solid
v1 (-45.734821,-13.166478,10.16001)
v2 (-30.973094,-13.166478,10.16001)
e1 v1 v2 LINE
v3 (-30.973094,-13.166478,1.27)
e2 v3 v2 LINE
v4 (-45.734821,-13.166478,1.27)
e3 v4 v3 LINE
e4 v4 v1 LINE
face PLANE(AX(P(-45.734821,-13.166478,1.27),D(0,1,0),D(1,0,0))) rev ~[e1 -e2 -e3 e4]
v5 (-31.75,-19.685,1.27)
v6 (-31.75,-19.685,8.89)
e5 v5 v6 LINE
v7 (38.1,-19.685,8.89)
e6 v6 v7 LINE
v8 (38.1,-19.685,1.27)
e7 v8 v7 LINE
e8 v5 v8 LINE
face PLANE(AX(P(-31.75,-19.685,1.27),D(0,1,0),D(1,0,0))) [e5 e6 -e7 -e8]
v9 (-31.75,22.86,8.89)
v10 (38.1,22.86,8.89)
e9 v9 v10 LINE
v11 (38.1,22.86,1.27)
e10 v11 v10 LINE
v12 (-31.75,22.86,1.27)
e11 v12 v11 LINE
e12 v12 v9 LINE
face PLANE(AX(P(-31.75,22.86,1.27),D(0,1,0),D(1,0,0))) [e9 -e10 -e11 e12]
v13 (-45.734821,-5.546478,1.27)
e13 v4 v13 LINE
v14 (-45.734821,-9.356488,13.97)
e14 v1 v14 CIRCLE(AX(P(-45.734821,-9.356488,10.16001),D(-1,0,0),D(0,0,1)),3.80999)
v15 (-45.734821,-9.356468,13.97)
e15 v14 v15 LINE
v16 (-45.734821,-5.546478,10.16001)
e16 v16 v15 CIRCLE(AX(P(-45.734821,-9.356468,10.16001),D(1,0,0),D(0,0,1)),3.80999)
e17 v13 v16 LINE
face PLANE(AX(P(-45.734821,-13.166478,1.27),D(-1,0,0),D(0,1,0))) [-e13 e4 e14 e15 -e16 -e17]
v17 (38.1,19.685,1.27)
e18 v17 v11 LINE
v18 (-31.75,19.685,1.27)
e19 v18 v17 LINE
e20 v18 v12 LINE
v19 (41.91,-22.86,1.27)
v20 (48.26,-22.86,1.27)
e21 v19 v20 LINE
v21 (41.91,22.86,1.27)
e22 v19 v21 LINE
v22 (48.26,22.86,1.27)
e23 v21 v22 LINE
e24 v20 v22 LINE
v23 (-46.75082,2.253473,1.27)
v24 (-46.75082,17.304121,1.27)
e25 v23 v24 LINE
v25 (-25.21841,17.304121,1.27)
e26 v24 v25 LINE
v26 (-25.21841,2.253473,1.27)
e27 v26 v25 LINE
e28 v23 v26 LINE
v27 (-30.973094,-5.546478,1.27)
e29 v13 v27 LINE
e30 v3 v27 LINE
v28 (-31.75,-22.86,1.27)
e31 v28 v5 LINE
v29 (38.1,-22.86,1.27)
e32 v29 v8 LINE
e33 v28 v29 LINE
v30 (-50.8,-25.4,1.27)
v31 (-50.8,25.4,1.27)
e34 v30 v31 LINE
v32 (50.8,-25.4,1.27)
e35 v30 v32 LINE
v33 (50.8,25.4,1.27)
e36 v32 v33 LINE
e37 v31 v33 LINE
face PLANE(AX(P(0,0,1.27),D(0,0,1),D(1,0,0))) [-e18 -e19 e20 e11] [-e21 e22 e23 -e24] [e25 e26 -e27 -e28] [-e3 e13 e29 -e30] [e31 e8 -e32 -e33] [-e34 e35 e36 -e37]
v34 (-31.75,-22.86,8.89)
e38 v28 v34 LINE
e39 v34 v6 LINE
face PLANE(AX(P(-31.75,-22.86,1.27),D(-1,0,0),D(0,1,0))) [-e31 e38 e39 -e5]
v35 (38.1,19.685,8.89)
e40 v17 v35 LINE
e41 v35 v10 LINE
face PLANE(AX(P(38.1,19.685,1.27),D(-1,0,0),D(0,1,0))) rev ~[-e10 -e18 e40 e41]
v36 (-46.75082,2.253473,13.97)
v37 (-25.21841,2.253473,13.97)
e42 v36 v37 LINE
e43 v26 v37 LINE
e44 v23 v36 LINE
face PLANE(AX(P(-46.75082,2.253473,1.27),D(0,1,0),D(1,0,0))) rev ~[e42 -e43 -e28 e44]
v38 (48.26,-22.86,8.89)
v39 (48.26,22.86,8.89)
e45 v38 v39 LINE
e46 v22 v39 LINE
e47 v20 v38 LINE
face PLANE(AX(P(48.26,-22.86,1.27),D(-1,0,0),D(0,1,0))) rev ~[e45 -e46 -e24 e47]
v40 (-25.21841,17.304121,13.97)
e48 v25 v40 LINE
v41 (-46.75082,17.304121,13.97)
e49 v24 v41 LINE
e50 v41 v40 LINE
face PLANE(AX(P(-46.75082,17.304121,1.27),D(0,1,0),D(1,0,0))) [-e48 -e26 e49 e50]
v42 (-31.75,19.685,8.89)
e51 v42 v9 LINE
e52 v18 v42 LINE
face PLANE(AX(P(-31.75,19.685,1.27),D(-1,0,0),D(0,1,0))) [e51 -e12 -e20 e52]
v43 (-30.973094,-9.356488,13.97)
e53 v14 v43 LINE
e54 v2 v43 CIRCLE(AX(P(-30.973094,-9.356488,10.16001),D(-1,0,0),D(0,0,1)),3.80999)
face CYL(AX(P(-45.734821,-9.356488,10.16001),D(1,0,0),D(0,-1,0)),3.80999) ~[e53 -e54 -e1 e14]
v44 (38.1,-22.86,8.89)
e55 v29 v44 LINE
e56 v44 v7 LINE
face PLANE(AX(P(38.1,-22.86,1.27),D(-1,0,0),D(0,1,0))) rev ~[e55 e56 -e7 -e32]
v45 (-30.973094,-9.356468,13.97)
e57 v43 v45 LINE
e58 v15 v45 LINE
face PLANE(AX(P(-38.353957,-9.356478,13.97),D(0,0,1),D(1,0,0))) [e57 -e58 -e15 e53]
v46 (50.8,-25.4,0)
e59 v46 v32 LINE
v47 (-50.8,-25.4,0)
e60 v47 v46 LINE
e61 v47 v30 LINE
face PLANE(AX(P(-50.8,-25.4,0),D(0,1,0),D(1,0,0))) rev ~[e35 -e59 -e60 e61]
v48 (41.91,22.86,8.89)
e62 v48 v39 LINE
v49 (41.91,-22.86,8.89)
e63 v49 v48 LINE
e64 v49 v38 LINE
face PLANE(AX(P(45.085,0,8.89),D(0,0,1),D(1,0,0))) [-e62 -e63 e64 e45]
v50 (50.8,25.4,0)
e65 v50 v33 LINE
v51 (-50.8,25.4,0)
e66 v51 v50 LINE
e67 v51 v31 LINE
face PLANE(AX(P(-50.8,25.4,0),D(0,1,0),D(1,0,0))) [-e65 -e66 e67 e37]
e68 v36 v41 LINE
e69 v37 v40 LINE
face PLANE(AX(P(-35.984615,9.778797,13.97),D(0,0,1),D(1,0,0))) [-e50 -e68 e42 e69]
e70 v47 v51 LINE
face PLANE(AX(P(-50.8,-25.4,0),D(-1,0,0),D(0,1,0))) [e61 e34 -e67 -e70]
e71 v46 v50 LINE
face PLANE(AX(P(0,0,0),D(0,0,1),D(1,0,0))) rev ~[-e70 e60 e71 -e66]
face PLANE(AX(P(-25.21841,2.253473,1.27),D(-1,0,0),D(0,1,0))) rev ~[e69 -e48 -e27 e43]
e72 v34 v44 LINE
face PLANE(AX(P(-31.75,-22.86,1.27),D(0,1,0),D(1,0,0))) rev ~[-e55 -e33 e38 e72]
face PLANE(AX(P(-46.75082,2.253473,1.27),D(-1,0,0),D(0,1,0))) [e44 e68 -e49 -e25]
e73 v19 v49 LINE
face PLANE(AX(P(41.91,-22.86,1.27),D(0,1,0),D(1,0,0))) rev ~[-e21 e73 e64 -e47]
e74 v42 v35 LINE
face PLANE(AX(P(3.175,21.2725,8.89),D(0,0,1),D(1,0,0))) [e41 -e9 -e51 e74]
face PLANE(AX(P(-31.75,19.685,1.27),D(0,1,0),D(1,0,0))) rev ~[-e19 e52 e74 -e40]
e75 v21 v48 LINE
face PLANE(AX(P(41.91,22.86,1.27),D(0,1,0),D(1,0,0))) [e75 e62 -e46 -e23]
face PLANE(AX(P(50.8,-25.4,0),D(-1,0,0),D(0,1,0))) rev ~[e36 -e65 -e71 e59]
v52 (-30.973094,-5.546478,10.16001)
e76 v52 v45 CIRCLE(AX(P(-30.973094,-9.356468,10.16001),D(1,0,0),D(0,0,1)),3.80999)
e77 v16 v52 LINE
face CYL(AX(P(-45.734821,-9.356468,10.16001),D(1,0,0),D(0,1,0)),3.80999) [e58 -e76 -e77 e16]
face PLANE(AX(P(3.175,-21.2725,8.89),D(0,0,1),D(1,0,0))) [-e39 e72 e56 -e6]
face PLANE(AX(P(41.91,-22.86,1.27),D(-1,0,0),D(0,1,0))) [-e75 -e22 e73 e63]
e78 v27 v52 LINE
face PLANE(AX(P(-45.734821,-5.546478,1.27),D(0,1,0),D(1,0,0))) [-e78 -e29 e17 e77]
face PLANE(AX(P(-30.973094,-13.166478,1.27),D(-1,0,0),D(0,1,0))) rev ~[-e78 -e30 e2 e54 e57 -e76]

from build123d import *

# Parameters (mm, degrees)
F0_W     = 101.6
F0_H     = 50.8
F1_DEPTH = 1.27
F2_W     = 69.85
F2_H     = 3.175
F2_W_2   = 6.35
F2_H_2   = 45.72
F3_DEPTH = 7.62
F4_W     = 21.532409323
F4_H     = 15.0506472416
F4_W_2   = 14.7617278114
F4_H_2   = 7.62
F5_DEPTH = 12.7
F6_R     = 3.80999


# Not quite as in the source:
# - a fillet or chamfer is up to 0.001 mm smaller than in the source, because OpenCascade refuses the exact size


with BuildPart() as f1:
    # F0 (on Top) → F1 (new body)
    with BuildSketch(Plane.XY):
        Rectangle(F0_W, F0_H)
    extrude(amount=F1_DEPTH)

    # F2 (on face) → F3 (join)
    with BuildSketch(Plane.XY.offset(1.27)):
        with Locations((3.175, 21.2725)):
            Rectangle(F2_W, F2_H)
        with Locations((45.085, 0)):
            Rectangle(F2_W_2, F2_H_2)
        with Locations((3.175, -21.2725)):
            Rectangle(F2_W, F2_H)
    extrude(amount=F3_DEPTH)

    # F4 (on face) → F5 (join)
    with BuildSketch(Plane.XY.offset(1.27)):
        with Locations((-35.9846150789, 9.7787969645)):
            Rectangle(F4_W, F4_H)
        with Locations((-38.3539574899, -9.3564780889)):
            Rectangle(F4_W_2, F4_H_2)
    extrude(amount=F5_DEPTH)

    # F6 (radius 3.81 in the source; OpenCascade refuses exactly that, so slightly less here)
    f6_edges = [f1.edges().sort_by_distance(p)[0] for p in [
        (-38.353957, -13.166478, 13.97),
        (-38.353957, -5.546478, 13.97),
    ]]
    fillet(f6_edges, radius=F6_R)


solid = f1.part
